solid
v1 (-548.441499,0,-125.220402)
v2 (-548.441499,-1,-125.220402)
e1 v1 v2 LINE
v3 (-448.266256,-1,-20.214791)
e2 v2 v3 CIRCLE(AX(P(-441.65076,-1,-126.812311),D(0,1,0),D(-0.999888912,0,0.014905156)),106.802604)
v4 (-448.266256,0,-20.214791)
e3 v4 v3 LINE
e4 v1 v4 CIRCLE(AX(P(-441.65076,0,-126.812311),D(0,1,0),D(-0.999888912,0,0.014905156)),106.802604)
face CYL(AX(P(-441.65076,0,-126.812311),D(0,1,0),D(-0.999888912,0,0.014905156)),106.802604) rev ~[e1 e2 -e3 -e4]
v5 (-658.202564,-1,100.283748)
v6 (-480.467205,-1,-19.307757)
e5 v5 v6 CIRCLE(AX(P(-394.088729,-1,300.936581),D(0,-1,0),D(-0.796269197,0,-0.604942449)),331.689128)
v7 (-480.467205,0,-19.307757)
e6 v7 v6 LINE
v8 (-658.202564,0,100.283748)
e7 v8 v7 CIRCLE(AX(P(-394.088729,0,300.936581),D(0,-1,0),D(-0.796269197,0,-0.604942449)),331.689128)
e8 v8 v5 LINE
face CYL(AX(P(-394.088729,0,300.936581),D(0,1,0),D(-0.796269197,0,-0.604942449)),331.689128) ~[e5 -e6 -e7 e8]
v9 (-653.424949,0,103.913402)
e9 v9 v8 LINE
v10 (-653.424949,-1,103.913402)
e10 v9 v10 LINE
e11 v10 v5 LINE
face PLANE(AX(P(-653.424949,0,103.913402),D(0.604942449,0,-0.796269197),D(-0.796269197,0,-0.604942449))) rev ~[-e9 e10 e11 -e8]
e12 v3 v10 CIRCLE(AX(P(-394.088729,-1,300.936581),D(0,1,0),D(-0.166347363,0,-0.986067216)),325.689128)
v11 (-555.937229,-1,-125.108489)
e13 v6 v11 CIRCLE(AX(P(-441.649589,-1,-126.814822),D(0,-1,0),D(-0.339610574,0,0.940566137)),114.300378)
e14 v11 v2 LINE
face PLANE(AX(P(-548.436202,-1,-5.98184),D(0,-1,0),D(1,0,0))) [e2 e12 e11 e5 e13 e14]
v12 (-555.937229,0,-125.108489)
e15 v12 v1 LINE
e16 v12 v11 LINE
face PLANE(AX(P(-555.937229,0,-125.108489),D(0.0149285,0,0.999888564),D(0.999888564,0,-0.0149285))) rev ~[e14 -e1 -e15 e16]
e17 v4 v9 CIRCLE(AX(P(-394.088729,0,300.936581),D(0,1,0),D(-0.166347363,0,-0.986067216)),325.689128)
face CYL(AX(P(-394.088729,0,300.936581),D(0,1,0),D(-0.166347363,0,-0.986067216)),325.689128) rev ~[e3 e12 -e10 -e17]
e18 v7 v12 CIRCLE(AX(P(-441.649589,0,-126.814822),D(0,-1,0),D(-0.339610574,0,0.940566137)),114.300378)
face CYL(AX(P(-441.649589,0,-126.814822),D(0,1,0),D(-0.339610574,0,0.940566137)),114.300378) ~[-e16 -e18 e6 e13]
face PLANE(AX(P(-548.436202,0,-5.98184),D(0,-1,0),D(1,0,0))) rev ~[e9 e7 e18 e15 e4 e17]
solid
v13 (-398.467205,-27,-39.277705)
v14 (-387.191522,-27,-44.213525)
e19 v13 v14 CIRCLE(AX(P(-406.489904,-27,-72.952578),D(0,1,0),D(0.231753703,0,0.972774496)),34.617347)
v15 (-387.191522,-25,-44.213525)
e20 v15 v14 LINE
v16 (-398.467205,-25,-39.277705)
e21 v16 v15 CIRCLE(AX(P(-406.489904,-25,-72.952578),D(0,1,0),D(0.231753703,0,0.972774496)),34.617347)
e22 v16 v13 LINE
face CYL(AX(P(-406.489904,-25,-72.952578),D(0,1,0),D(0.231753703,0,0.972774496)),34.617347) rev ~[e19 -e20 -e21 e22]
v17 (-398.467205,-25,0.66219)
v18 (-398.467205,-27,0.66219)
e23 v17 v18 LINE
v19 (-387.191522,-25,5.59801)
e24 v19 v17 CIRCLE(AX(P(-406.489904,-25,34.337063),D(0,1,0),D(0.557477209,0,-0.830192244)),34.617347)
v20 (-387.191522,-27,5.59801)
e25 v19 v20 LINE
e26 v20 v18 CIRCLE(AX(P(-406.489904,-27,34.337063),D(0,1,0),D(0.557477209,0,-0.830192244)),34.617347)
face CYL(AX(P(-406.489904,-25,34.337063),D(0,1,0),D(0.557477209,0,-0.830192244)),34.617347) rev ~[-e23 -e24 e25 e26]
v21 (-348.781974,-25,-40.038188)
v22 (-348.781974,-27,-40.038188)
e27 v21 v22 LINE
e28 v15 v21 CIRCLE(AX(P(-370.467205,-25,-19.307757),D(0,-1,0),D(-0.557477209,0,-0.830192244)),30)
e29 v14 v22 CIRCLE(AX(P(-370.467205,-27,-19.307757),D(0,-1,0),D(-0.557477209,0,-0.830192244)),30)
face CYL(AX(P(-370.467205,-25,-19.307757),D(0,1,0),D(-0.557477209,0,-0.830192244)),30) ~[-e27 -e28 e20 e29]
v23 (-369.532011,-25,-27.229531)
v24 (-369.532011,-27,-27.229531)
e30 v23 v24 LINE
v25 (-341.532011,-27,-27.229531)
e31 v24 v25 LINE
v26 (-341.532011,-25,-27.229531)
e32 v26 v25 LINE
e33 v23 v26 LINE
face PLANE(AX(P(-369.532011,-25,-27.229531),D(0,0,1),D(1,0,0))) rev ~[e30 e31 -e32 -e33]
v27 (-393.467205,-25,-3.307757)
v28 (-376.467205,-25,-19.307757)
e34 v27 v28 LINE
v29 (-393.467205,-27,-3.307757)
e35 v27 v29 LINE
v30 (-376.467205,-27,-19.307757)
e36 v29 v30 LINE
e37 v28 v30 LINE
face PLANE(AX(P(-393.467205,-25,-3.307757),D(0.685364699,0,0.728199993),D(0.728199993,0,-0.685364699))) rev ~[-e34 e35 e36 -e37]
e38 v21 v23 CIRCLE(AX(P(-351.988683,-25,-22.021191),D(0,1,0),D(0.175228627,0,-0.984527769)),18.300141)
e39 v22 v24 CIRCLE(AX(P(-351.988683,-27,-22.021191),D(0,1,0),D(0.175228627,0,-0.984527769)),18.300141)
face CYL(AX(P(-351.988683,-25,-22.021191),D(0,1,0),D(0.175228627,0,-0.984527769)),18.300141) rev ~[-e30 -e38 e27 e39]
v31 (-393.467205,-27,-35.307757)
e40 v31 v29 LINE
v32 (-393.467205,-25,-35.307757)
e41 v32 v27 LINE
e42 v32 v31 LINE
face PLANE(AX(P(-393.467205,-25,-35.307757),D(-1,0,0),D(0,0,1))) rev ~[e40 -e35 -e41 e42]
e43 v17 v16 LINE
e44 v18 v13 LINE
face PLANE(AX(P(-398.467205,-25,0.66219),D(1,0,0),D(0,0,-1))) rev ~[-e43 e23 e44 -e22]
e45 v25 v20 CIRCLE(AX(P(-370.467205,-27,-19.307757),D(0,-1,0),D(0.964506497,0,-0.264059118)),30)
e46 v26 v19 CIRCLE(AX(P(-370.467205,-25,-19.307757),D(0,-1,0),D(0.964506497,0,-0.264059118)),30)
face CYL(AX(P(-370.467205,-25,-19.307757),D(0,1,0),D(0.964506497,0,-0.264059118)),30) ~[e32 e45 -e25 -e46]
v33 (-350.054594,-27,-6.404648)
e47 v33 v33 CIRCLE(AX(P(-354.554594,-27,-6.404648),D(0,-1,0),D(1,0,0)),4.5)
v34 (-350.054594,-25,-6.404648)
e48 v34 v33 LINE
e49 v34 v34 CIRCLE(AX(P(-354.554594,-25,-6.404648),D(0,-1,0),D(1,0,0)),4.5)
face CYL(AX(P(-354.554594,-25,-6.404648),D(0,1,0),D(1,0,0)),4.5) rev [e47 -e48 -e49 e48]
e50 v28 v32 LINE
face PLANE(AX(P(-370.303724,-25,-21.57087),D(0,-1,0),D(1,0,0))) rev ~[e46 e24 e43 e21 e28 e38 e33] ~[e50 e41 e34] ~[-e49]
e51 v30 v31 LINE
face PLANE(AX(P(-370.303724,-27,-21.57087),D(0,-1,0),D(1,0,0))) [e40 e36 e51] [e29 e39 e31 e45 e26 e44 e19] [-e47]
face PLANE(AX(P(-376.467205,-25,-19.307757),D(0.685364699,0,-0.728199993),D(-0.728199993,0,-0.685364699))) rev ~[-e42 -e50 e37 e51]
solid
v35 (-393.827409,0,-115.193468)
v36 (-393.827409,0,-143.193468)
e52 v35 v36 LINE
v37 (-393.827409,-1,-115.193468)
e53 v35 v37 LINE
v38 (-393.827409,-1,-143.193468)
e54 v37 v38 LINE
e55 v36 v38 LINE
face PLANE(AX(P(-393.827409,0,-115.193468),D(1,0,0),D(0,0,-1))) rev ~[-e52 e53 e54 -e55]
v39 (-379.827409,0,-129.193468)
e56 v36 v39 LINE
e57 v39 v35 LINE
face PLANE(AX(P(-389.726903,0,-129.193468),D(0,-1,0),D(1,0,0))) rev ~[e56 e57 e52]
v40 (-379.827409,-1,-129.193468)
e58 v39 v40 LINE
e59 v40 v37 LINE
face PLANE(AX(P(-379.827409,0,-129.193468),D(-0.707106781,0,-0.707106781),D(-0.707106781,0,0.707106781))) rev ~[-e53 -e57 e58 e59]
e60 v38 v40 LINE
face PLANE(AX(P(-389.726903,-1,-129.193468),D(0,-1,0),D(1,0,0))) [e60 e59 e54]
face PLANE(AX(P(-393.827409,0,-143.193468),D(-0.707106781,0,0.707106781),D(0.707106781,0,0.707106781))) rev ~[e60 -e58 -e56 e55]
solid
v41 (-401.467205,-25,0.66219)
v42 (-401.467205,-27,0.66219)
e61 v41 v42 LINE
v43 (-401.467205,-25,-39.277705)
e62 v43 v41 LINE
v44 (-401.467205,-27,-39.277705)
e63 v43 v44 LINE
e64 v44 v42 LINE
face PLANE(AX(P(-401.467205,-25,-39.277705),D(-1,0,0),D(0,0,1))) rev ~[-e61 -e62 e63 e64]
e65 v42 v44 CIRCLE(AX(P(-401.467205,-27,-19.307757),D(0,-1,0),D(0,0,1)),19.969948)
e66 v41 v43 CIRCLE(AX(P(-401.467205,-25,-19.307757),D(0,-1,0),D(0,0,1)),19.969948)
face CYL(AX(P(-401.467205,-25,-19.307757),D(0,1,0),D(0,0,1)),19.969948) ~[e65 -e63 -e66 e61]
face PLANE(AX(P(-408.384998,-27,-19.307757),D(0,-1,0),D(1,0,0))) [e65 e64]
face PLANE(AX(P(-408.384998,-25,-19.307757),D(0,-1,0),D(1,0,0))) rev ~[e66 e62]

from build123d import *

# Parameters (mm, degrees)
F5_R     = 4.5
F6_DEPTH = 2
F8_DEPTH = 1
F9_DEPTH = 1


# Not quite as in the source:
# - a feature names something its author has since deleted; it is built from what else it names


with BuildPart() as f6:
    # F5 (on offset) → F6 (new body)
    with BuildSketch(Plane.XZ.offset(25)):
        with BuildLine():
            ThreePointArc((-398.467205436, -39.2777054383), (-392.6082274756, -41.2404384818), (-387.1915217022, -44.2135248081))
            ThreePointArc((-387.1915217022, -44.2135248081), (-367.2251337414, -49.1320591827), (-348.7819741916, -40.0381879271))
            ThreePointArc((-348.7819741916, -40.0381879271), (-361.6011790718, -37.5934442718), (-369.5320105339, -27.229531033))
            Line((-369.5320105339, -27.229531033), (-341.5320105339, -27.229531033))
            ThreePointArc((-341.5320105339, -27.229531033), (-352.9546885172, 5.0502340302), (-387.1915217022, 5.598009817))
            ThreePointArc((-387.1915217022, 5.598009817), (-392.6082274756, 2.6249234907), (-398.467205436, 0.6621904472))
            Line((-398.467205436, 0.6621904472), (-398.467205436, -39.2777054383))
        make_face()
        Polygon((-393.467205436, -3.3077574955), (-376.467205436, -19.3077574955), (-393.467205436, -35.3077574955), (-393.467205436, -19.3077574955), align=None, mode=Mode.SUBTRACT)
        with Locations((-354.5545938938, -6.4046481277)):
            Circle(F5_R, mode=Mode.SUBTRACT)
    extrude(amount=F6_DEPTH)


with BuildPart() as f6b:
    # F5 (on offset) → F6, piece 2 (new body)
    with BuildSketch(Plane.XZ.offset(25)):
        with BuildLine():
            Line((-401.467205436, -39.2777054383), (-401.467205436, 0.6621904472))
            ThreePointArc((-401.467205436, 0.6621904472), (-421.4371533787, -19.3077574955), (-401.467205436, -39.2777054383))
        make_face()
    extrude(amount=F6_DEPTH)


with BuildPart() as f8:
    # F7 (on Front) → F8 (new body)
    with BuildSketch(Plane.XZ):
        with BuildLine():
            Line((-653.4249486684, 103.9134022917), (-658.2025638487, 100.2837475989))
            ThreePointArc((-658.2025638487, 100.2837475989), (-579.2555377986, 25.744047787), (-480.467205436, -19.3077574955))
            ThreePointArc((-480.467205436, -19.3077574955), (-534.7020128056, -60.4384507793), (-555.9372290567, -125.1084890597))
            Line((-555.9372290567, -125.1084890597), (-548.4414986364, -125.2204015407))
            ThreePointArc((-548.4414986364, -125.2204015407), (-518.9281051059, -53.0898043717), (-448.2662559395, -20.2147907898))
            ThreePointArc((-448.2662559395, -20.2147907898), (-562.684901543, 22.2813486703), (-653.4249486684, 103.9134022917))
        make_face()
    extrude(amount=F8_DEPTH)

    # F7 (on Front) → F9 (join)
    with BuildSketch(Plane.XZ):
        with BuildLine():
            Line((-653.4249486684, 103.9134022917), (-658.2025638487, 100.2837475989))
            ThreePointArc((-658.2025638487, 100.2837475989), (-579.2555377986, 25.744047787), (-480.467205436, -19.3077574955))
            ThreePointArc((-480.467205436, -19.3077574955), (-534.7020128056, -60.4384507793), (-555.9372290567, -125.1084890597))
            Line((-555.9372290567, -125.1084890597), (-548.4414986364, -125.2204015407))
            ThreePointArc((-548.4414986364, -125.2204015407), (-518.9281051059, -53.0898043717), (-448.2662559395, -20.2147907898))
            ThreePointArc((-448.2662559395, -20.2147907898), (-562.684901543, 22.2813486703), (-653.4249486684, 103.9134022917))
        make_face()
    extrude(amount=F9_DEPTH)


with BuildPart() as f9:
    # F7 (on Front) → F9, piece 2 (new body)
    with BuildSketch(Plane.XZ):
        Polygon((-379.8274085522, -129.1934684515), (-393.8274085522, -115.1934684515), (-393.8274085522, -143.1934684515), align=None)
    extrude(amount=F9_DEPTH)


solid = Compound([f6.part, f6b.part, f8.part, f9.part])
